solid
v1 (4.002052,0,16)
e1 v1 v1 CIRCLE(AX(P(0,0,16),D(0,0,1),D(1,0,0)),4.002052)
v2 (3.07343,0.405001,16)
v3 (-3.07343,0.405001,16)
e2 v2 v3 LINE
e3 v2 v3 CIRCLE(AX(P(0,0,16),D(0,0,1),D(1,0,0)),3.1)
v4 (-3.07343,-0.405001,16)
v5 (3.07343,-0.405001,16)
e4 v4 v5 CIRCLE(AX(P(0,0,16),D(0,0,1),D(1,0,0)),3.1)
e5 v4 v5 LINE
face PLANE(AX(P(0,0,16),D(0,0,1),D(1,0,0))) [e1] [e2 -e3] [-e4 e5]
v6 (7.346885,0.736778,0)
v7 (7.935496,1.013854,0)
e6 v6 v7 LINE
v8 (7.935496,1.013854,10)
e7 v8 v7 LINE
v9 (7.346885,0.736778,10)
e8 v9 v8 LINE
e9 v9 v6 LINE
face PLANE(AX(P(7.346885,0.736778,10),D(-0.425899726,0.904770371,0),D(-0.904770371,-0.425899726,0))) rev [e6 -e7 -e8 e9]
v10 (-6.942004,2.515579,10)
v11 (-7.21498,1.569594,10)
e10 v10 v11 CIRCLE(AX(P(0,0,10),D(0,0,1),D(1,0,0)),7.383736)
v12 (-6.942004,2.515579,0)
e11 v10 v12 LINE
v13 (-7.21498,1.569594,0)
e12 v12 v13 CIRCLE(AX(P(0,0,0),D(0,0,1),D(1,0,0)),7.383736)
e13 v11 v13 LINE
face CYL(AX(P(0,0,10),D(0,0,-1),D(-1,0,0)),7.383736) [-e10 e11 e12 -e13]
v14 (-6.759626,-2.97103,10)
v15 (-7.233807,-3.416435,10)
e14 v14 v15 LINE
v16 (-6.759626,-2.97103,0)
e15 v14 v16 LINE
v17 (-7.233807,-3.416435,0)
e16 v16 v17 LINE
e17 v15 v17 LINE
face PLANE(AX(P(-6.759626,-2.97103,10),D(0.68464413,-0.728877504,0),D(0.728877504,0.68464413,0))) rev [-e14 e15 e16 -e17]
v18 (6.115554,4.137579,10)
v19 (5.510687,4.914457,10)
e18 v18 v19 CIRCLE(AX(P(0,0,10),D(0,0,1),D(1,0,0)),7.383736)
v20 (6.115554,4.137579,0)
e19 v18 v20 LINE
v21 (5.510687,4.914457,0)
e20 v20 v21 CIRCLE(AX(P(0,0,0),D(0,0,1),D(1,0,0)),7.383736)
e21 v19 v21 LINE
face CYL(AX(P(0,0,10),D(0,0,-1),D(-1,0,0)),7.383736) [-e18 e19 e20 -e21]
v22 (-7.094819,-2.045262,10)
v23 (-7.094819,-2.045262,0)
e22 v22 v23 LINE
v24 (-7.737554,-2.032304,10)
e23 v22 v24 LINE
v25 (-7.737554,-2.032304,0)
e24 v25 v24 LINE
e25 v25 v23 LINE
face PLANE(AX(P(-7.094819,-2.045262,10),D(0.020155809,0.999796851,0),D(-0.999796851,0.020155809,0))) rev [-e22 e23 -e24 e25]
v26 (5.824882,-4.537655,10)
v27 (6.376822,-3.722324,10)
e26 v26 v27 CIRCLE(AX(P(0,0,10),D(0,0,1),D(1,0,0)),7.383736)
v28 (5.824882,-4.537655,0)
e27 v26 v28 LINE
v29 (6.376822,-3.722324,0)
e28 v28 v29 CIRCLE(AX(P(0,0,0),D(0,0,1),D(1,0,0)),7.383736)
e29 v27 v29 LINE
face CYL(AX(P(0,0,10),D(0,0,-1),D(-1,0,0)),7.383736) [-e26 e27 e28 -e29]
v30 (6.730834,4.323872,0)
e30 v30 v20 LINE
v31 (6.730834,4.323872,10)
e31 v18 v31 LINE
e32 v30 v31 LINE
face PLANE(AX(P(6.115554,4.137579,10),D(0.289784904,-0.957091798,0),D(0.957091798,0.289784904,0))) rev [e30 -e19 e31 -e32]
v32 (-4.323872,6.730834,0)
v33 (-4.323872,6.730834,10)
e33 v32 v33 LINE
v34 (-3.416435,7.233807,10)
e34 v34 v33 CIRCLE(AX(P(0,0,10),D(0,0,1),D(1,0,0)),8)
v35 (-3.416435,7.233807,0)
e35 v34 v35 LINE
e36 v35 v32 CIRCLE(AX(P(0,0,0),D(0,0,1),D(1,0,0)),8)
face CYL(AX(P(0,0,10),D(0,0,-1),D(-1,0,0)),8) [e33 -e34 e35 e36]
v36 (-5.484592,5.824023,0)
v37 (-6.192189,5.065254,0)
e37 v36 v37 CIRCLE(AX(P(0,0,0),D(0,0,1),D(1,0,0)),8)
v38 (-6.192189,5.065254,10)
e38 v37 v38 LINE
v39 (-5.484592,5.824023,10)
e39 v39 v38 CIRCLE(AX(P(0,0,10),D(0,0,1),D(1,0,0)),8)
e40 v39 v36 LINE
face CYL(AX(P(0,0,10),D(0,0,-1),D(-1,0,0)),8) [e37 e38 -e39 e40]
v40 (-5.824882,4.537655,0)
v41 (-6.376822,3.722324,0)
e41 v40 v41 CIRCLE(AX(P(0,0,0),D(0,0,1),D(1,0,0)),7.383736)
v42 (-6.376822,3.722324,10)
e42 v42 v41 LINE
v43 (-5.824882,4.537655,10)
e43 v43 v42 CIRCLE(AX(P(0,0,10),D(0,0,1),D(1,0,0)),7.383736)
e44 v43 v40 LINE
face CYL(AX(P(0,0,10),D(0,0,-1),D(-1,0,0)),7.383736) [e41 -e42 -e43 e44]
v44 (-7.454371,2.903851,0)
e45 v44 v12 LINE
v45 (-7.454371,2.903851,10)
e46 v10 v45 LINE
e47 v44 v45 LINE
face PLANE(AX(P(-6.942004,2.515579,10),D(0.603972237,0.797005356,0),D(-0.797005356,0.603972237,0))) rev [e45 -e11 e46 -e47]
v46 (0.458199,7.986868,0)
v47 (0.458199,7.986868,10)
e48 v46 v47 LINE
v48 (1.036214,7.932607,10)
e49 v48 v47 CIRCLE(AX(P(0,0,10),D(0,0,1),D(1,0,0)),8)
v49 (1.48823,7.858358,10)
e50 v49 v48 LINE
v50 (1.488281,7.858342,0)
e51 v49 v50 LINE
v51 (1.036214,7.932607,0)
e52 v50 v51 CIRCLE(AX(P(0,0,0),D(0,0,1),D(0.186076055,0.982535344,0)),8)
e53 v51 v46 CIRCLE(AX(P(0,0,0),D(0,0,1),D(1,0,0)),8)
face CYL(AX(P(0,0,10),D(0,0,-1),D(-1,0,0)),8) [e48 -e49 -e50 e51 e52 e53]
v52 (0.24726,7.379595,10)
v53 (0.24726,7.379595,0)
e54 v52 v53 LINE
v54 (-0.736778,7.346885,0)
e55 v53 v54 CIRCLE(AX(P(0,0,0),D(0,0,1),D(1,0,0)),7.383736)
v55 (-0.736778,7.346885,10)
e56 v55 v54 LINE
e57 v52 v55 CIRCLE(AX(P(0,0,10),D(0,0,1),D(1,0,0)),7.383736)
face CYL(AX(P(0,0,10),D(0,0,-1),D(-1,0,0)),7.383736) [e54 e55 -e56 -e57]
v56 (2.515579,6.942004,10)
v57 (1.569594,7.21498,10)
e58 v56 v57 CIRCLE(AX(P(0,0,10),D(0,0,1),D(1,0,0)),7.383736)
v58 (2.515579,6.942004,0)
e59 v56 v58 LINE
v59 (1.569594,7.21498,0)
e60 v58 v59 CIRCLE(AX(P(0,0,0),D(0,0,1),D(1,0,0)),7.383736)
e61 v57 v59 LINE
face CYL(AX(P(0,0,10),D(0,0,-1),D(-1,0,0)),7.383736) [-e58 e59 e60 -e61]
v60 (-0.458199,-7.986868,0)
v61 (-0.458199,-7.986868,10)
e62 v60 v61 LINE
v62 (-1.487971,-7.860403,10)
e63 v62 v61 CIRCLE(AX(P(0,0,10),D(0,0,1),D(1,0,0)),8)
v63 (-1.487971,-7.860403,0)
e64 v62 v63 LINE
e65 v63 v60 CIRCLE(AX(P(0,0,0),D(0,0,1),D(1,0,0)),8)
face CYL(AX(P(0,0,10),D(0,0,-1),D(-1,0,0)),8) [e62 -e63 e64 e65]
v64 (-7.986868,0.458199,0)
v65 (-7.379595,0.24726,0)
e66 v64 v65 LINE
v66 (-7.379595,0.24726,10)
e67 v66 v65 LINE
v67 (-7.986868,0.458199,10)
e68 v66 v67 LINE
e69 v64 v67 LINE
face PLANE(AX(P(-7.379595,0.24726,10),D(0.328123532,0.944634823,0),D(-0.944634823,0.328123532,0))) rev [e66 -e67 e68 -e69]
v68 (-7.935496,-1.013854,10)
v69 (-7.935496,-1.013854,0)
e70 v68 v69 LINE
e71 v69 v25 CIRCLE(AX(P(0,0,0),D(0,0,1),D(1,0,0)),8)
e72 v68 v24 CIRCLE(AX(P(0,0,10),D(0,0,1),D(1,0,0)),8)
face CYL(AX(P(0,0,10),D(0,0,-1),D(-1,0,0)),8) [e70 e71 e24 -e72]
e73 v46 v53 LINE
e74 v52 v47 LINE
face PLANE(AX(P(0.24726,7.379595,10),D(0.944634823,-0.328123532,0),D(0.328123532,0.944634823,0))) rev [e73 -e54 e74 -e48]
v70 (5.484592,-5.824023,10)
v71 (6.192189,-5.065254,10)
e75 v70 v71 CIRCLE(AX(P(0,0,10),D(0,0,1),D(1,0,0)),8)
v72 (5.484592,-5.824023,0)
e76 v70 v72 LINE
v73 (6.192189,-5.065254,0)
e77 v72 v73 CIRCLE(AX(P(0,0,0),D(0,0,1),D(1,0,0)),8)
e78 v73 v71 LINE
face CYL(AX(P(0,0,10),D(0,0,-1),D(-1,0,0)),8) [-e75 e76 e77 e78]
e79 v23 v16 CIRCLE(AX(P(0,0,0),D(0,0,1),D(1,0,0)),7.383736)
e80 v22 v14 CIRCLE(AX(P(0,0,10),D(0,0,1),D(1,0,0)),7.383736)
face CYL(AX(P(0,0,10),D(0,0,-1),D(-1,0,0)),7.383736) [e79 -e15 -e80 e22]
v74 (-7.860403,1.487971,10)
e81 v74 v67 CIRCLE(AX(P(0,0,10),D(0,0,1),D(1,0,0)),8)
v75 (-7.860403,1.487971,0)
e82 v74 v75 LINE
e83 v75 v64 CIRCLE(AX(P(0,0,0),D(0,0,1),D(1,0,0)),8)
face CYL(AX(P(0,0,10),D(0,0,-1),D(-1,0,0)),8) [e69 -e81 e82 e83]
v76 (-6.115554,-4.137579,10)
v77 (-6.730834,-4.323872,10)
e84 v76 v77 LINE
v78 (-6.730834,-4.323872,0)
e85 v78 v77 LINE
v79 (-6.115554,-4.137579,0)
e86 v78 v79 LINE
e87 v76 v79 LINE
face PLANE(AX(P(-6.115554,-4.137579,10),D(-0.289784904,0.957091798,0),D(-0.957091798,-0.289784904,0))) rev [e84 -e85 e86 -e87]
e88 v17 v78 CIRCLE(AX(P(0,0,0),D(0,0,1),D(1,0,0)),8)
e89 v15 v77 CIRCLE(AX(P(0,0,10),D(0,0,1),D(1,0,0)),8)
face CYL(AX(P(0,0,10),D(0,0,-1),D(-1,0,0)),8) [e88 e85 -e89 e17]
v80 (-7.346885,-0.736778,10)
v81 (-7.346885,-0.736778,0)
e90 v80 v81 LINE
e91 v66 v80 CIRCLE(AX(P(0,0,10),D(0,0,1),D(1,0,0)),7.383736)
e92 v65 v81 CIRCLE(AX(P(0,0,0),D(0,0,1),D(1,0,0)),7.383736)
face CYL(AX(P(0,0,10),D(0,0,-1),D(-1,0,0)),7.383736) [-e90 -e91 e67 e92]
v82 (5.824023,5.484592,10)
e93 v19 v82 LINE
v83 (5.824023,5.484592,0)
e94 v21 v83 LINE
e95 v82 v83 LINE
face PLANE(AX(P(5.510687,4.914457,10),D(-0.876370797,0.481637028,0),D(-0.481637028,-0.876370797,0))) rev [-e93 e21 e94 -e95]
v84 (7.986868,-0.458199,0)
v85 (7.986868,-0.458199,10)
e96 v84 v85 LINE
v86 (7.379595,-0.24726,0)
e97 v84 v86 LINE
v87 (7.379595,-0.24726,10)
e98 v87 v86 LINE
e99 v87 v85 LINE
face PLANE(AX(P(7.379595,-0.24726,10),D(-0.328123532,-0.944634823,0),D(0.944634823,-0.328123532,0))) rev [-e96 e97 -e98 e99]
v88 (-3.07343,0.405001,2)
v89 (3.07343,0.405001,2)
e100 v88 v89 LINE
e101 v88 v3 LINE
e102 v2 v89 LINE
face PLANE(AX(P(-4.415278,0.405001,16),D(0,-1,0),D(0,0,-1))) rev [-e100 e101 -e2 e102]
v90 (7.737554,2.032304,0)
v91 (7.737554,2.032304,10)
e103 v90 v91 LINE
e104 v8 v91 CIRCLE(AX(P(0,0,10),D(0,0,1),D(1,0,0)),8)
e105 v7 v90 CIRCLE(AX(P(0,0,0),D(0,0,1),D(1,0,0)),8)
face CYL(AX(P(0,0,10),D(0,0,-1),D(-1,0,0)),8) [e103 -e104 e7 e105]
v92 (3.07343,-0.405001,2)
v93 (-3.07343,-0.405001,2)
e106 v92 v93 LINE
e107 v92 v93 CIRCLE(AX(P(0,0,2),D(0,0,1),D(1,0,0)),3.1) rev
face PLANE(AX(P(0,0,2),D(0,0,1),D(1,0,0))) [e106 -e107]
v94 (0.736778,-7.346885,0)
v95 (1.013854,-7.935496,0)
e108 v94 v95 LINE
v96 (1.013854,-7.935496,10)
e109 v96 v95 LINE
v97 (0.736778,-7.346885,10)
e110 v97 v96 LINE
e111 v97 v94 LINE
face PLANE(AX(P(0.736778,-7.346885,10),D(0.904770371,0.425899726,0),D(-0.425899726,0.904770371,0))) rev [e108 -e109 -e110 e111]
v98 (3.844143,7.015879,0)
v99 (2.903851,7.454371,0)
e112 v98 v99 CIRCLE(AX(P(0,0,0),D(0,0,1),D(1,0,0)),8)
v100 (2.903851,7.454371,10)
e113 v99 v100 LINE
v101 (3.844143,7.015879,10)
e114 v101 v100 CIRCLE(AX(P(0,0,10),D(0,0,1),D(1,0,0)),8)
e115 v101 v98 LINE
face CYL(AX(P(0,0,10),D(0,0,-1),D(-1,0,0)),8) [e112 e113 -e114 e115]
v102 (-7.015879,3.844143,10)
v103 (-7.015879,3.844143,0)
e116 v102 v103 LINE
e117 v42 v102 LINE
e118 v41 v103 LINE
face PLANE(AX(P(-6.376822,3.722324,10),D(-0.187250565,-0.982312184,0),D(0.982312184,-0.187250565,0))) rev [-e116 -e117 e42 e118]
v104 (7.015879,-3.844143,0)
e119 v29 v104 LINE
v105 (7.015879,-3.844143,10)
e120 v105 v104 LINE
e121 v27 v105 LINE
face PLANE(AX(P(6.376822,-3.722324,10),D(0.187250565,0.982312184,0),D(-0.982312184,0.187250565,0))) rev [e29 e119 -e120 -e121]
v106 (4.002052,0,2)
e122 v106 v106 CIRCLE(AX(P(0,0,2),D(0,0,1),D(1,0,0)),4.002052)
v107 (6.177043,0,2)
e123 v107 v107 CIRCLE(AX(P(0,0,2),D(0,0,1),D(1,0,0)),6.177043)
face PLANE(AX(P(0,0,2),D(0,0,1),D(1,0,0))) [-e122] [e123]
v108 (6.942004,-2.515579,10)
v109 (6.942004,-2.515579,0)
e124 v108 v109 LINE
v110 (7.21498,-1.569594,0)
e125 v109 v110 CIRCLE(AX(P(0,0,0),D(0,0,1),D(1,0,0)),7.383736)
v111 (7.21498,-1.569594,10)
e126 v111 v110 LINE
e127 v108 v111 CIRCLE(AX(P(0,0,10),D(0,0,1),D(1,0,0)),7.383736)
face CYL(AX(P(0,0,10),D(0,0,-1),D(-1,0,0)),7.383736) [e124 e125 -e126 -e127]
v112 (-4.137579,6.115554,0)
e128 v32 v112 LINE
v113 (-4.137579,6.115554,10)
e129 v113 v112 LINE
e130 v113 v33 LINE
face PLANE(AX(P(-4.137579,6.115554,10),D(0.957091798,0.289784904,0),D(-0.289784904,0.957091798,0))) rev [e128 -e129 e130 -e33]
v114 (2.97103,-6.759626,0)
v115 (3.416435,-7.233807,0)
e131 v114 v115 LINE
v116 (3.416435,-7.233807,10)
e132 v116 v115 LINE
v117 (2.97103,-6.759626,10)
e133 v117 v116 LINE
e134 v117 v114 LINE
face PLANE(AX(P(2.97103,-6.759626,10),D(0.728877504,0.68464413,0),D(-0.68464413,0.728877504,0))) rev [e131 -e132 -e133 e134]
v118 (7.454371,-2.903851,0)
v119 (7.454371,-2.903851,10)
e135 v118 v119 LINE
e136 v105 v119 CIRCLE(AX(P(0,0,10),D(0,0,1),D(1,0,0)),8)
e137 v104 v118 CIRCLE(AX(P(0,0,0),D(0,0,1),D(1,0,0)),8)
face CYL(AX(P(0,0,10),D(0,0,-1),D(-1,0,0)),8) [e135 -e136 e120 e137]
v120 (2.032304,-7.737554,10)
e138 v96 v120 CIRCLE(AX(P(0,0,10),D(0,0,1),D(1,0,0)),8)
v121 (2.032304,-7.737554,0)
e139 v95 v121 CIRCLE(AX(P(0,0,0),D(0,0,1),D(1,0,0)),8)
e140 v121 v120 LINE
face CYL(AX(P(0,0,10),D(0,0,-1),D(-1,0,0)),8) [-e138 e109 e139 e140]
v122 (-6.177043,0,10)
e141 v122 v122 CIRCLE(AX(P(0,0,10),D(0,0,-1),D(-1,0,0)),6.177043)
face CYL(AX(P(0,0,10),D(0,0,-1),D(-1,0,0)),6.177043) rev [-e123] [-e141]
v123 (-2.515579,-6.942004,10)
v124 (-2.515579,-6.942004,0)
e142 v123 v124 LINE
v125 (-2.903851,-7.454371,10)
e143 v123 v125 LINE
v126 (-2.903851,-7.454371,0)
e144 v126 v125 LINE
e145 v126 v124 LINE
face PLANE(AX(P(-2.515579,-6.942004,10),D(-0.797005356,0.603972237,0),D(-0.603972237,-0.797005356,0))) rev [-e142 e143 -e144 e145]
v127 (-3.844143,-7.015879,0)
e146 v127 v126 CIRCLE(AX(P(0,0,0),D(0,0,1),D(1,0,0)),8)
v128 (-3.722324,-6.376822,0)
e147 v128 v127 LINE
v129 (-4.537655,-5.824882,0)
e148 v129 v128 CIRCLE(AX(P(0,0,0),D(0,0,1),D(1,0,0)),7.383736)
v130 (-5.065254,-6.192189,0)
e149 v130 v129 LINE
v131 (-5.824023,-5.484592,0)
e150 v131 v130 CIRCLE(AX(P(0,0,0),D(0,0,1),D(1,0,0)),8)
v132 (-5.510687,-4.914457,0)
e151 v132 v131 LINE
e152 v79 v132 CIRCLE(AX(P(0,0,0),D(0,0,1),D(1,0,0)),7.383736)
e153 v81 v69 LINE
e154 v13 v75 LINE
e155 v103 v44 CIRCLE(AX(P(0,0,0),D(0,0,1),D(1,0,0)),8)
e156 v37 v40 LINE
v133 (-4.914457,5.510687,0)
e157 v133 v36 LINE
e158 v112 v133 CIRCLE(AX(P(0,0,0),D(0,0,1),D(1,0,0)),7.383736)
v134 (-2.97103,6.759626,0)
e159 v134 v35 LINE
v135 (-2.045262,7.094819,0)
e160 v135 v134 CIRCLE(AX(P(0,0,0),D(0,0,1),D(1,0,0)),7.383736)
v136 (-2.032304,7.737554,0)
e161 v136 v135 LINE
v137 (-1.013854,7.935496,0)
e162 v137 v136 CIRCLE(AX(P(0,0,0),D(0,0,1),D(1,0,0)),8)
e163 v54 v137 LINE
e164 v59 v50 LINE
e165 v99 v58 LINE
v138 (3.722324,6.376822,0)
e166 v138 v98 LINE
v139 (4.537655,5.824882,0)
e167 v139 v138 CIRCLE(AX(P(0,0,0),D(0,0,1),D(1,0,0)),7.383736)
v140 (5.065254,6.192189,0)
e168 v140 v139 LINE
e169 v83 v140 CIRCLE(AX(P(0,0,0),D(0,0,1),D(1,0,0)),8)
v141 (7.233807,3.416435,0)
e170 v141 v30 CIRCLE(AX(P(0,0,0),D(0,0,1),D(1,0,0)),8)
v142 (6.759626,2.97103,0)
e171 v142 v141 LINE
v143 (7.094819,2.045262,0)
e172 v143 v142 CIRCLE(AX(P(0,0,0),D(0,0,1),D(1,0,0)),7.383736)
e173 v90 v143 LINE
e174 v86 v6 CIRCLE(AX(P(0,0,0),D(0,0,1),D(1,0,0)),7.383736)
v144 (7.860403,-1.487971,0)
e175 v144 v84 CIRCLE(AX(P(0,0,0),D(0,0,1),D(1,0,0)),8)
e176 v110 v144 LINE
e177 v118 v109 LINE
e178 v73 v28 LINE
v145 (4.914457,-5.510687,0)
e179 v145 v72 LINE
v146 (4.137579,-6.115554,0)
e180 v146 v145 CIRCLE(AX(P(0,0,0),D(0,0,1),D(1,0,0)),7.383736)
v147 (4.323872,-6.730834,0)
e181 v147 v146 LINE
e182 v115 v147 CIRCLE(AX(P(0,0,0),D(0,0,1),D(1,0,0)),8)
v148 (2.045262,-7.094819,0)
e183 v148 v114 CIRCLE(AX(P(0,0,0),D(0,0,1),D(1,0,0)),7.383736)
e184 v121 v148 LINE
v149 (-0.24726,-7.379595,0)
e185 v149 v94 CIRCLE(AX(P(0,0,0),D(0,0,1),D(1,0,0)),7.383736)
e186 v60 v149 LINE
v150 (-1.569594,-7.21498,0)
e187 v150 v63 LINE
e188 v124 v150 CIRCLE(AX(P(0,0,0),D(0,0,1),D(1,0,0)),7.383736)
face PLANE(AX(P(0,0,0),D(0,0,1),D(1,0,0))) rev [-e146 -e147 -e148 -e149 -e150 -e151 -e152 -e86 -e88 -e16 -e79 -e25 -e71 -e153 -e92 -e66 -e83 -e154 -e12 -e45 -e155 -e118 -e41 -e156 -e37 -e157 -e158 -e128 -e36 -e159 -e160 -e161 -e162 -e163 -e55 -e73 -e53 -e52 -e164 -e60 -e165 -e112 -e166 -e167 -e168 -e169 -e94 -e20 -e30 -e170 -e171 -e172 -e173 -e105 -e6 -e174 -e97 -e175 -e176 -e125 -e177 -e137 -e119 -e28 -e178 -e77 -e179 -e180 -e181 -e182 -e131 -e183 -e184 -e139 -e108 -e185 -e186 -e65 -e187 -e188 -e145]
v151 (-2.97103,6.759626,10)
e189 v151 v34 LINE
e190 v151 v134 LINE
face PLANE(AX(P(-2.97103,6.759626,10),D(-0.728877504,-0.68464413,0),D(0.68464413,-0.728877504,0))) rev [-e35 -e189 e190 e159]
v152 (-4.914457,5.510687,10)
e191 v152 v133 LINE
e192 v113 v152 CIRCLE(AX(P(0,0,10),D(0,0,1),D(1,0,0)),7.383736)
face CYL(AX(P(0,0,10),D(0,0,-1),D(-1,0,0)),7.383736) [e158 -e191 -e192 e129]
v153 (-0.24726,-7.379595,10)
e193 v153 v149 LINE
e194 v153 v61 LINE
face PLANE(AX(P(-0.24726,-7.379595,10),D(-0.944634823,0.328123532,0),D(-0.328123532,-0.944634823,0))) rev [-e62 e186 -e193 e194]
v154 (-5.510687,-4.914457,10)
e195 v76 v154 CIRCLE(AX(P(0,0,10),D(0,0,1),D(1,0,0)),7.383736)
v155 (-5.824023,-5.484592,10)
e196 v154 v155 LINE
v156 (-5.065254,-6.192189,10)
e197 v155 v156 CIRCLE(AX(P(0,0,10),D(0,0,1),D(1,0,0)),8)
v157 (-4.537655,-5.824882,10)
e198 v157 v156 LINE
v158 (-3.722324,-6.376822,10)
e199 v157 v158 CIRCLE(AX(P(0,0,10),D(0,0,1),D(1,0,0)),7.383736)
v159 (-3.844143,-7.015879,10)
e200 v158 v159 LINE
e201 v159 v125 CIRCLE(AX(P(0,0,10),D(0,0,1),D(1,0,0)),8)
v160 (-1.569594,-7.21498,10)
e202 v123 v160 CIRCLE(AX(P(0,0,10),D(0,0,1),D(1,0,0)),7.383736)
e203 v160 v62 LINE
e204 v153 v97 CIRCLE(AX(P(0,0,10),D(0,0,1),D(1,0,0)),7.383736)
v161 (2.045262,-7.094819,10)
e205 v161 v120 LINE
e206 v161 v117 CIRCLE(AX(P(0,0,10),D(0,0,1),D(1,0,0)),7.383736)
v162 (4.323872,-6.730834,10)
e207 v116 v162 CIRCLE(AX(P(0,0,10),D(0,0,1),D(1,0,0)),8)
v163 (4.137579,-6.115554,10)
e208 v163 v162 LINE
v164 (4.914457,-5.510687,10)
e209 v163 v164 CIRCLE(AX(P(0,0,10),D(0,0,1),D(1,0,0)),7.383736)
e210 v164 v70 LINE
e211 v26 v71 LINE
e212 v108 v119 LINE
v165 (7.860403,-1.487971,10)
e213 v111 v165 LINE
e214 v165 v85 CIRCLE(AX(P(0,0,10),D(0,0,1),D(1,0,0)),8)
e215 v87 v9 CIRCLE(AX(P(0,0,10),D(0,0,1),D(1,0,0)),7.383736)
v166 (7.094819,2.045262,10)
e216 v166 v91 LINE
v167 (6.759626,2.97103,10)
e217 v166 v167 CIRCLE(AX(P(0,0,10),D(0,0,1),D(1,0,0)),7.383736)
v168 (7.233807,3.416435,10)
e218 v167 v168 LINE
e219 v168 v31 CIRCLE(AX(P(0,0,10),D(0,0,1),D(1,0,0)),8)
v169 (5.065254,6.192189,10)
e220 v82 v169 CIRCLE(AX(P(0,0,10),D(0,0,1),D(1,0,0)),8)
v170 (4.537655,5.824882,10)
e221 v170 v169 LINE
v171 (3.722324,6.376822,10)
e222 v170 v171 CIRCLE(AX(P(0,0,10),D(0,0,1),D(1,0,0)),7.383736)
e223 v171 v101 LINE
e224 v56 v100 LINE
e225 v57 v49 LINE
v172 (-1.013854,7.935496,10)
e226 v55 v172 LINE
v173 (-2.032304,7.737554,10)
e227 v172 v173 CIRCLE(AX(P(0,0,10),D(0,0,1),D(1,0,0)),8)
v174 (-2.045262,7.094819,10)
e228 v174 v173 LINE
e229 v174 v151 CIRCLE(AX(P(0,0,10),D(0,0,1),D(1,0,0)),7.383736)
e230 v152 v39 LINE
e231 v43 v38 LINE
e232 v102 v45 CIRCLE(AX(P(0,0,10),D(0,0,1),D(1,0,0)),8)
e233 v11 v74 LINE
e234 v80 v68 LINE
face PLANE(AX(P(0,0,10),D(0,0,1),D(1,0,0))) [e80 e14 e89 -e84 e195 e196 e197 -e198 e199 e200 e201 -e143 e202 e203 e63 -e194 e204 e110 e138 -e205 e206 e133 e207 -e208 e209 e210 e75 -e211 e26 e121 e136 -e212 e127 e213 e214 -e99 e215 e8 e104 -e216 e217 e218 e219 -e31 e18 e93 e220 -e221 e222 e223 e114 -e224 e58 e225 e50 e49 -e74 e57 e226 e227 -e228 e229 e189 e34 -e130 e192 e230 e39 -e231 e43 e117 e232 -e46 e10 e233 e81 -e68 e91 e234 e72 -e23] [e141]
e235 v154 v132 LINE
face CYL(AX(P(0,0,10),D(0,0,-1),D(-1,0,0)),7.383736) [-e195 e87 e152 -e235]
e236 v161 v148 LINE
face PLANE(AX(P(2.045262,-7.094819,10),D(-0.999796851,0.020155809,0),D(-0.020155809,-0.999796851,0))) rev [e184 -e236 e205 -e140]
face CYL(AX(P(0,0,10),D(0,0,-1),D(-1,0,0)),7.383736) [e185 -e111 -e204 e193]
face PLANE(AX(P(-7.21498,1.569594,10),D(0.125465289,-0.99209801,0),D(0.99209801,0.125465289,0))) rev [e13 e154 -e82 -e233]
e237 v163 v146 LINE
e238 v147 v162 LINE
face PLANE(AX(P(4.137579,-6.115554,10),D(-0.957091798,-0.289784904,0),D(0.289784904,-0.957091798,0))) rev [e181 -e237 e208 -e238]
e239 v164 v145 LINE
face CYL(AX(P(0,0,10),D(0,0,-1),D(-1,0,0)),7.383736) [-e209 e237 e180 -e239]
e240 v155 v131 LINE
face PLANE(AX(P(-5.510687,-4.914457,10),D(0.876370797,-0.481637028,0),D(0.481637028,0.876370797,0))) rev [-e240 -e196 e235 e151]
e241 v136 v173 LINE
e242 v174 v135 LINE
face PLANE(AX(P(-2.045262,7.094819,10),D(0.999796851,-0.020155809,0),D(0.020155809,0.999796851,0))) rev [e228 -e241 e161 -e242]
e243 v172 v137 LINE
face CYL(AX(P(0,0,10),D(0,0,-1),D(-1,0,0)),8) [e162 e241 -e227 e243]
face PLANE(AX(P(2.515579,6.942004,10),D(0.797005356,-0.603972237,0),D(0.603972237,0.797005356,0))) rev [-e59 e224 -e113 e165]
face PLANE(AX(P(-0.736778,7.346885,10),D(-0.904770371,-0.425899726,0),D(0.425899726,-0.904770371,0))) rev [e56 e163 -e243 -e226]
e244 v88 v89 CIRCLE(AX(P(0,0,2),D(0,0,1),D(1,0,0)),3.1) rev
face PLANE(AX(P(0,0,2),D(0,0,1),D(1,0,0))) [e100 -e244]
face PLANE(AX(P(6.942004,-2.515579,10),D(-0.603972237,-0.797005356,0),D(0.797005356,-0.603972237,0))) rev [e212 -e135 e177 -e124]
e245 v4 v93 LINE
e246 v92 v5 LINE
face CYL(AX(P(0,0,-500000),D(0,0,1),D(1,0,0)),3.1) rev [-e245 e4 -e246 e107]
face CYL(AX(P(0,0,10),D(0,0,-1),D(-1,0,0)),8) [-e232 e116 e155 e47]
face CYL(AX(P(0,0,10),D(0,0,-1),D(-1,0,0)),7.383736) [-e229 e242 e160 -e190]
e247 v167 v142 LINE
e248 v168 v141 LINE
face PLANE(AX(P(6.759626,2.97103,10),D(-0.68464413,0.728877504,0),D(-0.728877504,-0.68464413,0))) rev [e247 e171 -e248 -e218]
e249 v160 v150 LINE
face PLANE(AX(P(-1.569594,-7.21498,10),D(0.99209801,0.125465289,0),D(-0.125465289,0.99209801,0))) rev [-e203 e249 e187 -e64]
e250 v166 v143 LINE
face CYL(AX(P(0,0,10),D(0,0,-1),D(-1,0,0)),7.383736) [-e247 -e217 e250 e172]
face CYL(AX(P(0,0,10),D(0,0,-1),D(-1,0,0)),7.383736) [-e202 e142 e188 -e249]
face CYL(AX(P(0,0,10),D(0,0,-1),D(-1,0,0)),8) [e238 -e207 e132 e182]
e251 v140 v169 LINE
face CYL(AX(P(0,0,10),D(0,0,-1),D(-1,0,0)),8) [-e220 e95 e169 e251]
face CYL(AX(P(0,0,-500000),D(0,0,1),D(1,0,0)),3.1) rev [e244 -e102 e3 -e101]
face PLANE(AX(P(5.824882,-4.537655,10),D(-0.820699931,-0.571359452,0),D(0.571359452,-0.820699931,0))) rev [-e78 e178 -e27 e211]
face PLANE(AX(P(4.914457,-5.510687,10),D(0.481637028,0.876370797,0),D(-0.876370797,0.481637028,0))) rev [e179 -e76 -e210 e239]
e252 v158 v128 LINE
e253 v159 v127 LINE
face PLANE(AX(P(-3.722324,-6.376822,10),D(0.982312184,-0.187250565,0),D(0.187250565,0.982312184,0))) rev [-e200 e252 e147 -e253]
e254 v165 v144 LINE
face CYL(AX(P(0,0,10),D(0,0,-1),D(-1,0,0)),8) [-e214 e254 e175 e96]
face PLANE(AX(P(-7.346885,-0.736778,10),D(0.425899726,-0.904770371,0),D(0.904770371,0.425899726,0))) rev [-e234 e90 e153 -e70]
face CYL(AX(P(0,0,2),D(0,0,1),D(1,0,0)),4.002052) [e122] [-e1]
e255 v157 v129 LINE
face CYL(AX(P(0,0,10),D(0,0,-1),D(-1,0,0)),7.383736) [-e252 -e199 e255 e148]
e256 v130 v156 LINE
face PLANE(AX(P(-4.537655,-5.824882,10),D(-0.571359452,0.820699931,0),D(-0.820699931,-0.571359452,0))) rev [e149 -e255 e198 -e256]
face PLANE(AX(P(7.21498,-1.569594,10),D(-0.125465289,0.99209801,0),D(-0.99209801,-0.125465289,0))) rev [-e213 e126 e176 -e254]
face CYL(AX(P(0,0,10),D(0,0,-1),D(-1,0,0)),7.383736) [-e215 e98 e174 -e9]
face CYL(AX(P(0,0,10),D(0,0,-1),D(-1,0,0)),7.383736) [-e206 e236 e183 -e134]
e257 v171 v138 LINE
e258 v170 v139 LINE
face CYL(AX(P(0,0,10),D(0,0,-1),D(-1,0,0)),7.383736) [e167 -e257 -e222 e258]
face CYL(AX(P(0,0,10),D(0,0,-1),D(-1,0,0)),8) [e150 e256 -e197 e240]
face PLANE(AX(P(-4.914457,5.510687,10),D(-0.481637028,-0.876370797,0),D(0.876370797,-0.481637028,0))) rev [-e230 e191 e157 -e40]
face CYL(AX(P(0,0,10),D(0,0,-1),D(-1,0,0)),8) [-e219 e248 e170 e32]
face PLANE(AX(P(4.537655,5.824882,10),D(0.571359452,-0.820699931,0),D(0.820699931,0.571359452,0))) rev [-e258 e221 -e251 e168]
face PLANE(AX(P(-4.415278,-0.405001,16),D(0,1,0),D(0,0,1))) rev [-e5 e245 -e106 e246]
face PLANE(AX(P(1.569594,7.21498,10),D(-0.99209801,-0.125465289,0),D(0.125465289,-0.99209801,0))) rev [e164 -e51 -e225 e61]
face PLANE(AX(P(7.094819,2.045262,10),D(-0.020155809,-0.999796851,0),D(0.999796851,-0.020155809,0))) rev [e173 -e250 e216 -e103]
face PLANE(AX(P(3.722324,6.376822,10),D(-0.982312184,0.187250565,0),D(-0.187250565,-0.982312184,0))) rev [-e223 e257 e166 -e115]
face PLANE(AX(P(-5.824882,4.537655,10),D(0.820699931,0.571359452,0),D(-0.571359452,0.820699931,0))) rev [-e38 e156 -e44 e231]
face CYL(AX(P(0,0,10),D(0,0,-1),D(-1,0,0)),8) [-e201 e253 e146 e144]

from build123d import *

# Parameters (mm, degrees)
CROQUIS1_R                    = 8
SALIENTE_EXTRUIR1_DEPTH       = 10
CROQUIS2_R                    = 7
CORTAR_EXTRUIR1_DEPTH         = 8
CROQUIS3_R                    = 5
SALIENTE_EXTRUIR2_DEPTH       = 14
CROQUIS4_R                    = 3.5
CORTAR_EXTRUIR2_DEPTH         = 14
CROQUIS5_W                    = 8.830556774
CROQUIS5_H                    = 0.810001326
SALIENTE_EXTRUIR3_DEPTH       = 14
SALIENTE_EXTRUIR4_START       = -10
SALIENTE_EXTRUIR4_OUTLINE_R   = 7
SALIENTE_EXTRUIR4_OUTLINE_R_2 = 6.177042676
SALIENTE_EXTRUIR4_DEPTH       = 8
CORTAR_EXTRUIR10_DEPTH        = 10
SALIENTE_EXTRUIR7_START       = -14
CROQUIS12_R                   = 3.5
CROQUIS12_R_2                 = 3.1
SALIENTE_EXTRUIR7_DEPTH       = 14
CROQUIS14_R                   = 5.293122991
CROQUIS14_R_2                 = 4.002052416
CORTAR_EXTRUIR15_DEPTH        = 14


# Read off the part's stored shape, not the designer's step: Saliente-Extruir4
with BuildPart() as part:
    # Croquis1 → Saliente-Extruir1 (new body)
    with BuildSketch(Plane.XY):
        Circle(CROQUIS1_R)
    extrude(amount=SALIENTE_EXTRUIR1_DEPTH)

    # Croquis2 → Cortar-Extruir1 (cut)
    with BuildSketch(Plane.XY.offset(10)):
        Circle(CROQUIS2_R)
    extrude(amount=-CORTAR_EXTRUIR1_DEPTH, mode=Mode.SUBTRACT)

    # Croquis3 → Saliente-Extruir2 (add)
    with BuildSketch(Plane.XY.offset(2)):
        Circle(CROQUIS3_R)
    extrude(amount=SALIENTE_EXTRUIR2_DEPTH)

    # Croquis4 → Cortar-Extruir2 (cut)
    with BuildSketch(Plane.XY.offset(16)):
        Circle(CROQUIS4_R)
    extrude(amount=-CORTAR_EXTRUIR2_DEPTH, mode=Mode.SUBTRACT)

    # Croquis5 → Saliente-Extruir3 (add)
    with BuildSketch(Plane.XY.offset(2)):
        Rectangle(CROQUIS5_W, CROQUIS5_H)
    extrude(amount=SALIENTE_EXTRUIR3_DEPTH)

    # Saliente-Extruir4 outline → Saliente-Extruir4 (add)
    with BuildSketch(Plane(origin=(0, 0, 0), x_dir=(-1, 0, 0), z_dir=(0, 0, -1)).offset(SALIENTE_EXTRUIR4_START)):
        Circle(SALIENTE_EXTRUIR4_OUTLINE_R)
        Circle(SALIENTE_EXTRUIR4_OUTLINE_R_2, mode=Mode.SUBTRACT)
    extrude(amount=SALIENTE_EXTRUIR4_DEPTH)

    # Croquis11 → Cortar-Extruir10 (cut)
    with BuildSketch(Plane(origin=(0, 0, 0), x_dir=(-1, 0, 0), z_dir=(0, 0, -1))):
        with BuildLine():
            Line((-0.247260298, 7.379594776), (-0.5002941, 8.108053777))
            Line((-0.5002941, 8.108053777), (1.061510951, 8.036738478))
            Line((1.061510951, 8.036738478), (0.736778233, 7.346884683))
            ThreePointArc((0.736778233, 7.346884683), (0.245304789, 7.379660038), (-0.247260298, 7.379594776))
        make_face()
        with BuildLine():
            Line((2.029718445, 7.865816758), (3.493045676, 7.315367575))
            Line((3.493045676, 7.315367575), (2.971029962, 6.759625557))
            ThreePointArc((2.971029962, 6.759625557), (2.513739083, 6.942670418), (2.045261679, 7.094819334))
            Line((2.045261679, 7.094819334), (2.029718445, 7.865816758))
        make_face()
        with BuildLine():
            Line((4.137579194, 6.115553542), (4.361048006, 6.853618791))
            Line((4.361048006, 6.853618791), (5.582656753, 5.877917526))
            Line((5.582656753, 5.877917526), (4.914456579, 5.510687185))
            ThreePointArc((4.914456579, 5.510687185), (4.536111081, 5.826083846), (4.137579194, 6.115553542))
        make_face()
        with BuildLine():
            Line((5.824881629, 4.537654761), (6.265487803, 5.170540864))
            Line((6.265487803, 5.170540864), (7.12579849, 3.865095955))
            Line((7.12579849, 3.865095955), (6.376821944, 3.722324356))
            ThreePointArc((6.376821944, 3.722324356), (6.114456921, 4.139199594), (5.824881629, 4.537654761))
        make_face()
        with BuildLine():
            Line((6.942004065, 2.515578715), (7.556618, 2.981334372))
            Line((7.556618, 2.981334372), (7.971417423, 1.473931862))
            Line((7.971417423, 1.473931862), (7.214979548, 1.569594483))
            ThreePointArc((7.214979548, 1.569594483), (7.094277116, 2.047141646), (6.942004065, 2.515578715))
        make_face()
        with BuildLine():
            Line((7.379594776, 0.247260298), (8.108053777, 0.5002941))
            Line((8.108053777, 0.5002941), (8.036738478, -1.061510951))
            Line((8.036738478, -1.061510951), (7.346884683, -0.736778233))
            ThreePointArc((7.346884683, -0.736778233), (7.379660038, -0.245304789), (7.379594776, 0.247260298))
        make_face()
        with BuildLine():
            Line((7.094819334, -2.045261679), (7.865816758, -2.029718445))
            Line((7.865816758, -2.029718445), (7.315367575, -3.493045676))
            Line((7.315367575, -3.493045676), (6.759625557, -2.971029962))
            ThreePointArc((6.759625557, -2.971029962), (6.942670418, -2.513739083), (7.094819334, -2.045261679))
        make_face()
        with BuildLine():
            Line((6.115553542, -4.137579194), (6.853618791, -4.361048006))
            Line((6.853618791, -4.361048006), (5.877917526, -5.582656753))
            Line((5.877917526, -5.582656753), (5.510687185, -4.914456579))
            ThreePointArc((5.510687185, -4.914456579), (5.826083846, -4.536111081), (6.115553542, -4.137579194))
        make_face()
        with BuildLine():
            Line((4.537654761, -5.824881629), (5.170540864, -6.265487803))
            Line((5.170540864, -6.265487803), (3.865095955, -7.12579849))
            Line((3.865095955, -7.12579849), (3.722324356, -6.376821944))
            ThreePointArc((3.722324356, -6.376821944), (4.139199594, -6.114456921), (4.537654761, -5.824881629))
        make_face()
        with BuildLine():
            Line((2.515578715, -6.942004065), (2.981334372, -7.556618))
            Line((2.981334372, -7.556618), (1.473931862, -7.971417423))
            Line((1.473931862, -7.971417423), (1.569594483, -7.214979548))
            ThreePointArc((1.569594483, -7.214979548), (2.047141646, -7.094277116), (2.515578715, -6.942004065))
        make_face()
        with BuildLine():
            Line((0.247260298, -7.379594776), (0.5002941, -8.108053777))
            Line((0.5002941, -8.108053777), (-1.061510951, -8.036738478))
            Line((-1.061510951, -8.036738478), (-0.736778233, -7.346884683))
            ThreePointArc((-0.736778233, -7.346884683), (-0.245304789, -7.379660038), (0.247260298, -7.379594776))
        make_face()
        with BuildLine():
            Line((-2.045261679, -7.094819334), (-2.029718445, -7.865816758))
            Line((-2.029718445, -7.865816758), (-3.493045676, -7.315367575))
            Line((-3.493045676, -7.315367575), (-2.971029962, -6.759625557))
            ThreePointArc((-2.971029962, -6.759625557), (-2.513739083, -6.942670418), (-2.045261679, -7.094819334))
        make_face()
        with BuildLine():
            Line((-4.137579194, -6.115553542), (-4.361048006, -6.853618791))
            Line((-4.361048006, -6.853618791), (-5.582656753, -5.877917526))
            Line((-5.582656753, -5.877917526), (-4.914456579, -5.510687185))
            ThreePointArc((-4.914456579, -5.510687185), (-4.536111081, -5.826083846), (-4.137579194, -6.115553542))
        make_face()
        with BuildLine():
            Line((-5.824881629, -4.537654761), (-6.265487803, -5.170540864))
            Line((-6.265487803, -5.170540864), (-7.12579849, -3.865095955))
            Line((-7.12579849, -3.865095955), (-6.376821944, -3.722324356))
            ThreePointArc((-6.376821944, -3.722324356), (-6.114456921, -4.139199594), (-5.824881629, -4.537654761))
        make_face()
        with BuildLine():
            Line((-6.942004065, -2.515578715), (-7.556618, -2.981334372))
            Line((-7.556618, -2.981334372), (-7.971417423, -1.473931862))
            Line((-7.971417423, -1.473931862), (-7.214979548, -1.569594483))
            ThreePointArc((-7.214979548, -1.569594483), (-7.094277116, -2.047141646), (-6.942004065, -2.515578715))
        make_face()
        with BuildLine():
            Line((-7.379594776, -0.247260298), (-8.108053777, -0.5002941))
            Line((-8.108053777, -0.5002941), (-8.036738478, 1.061510951))
            Line((-8.036738478, 1.061510951), (-7.346884683, 0.736778233))
            ThreePointArc((-7.346884683, 0.736778233), (-7.379660038, 0.245304789), (-7.379594776, -0.247260298))
        make_face()
        with BuildLine():
            Line((-7.094819334, 2.045261679), (-7.865816758, 2.029718445))
            Line((-7.865816758, 2.029718445), (-7.315367575, 3.493045676))
            Line((-7.315367575, 3.493045676), (-6.759625557, 2.971029962))
            ThreePointArc((-6.759625557, 2.971029962), (-6.942670418, 2.513739083), (-7.094819334, 2.045261679))
        make_face()
        with BuildLine():
            Line((-6.115553542, 4.137579194), (-6.853618791, 4.361048006))
            Line((-6.853618791, 4.361048006), (-5.877917526, 5.582656753))
            Line((-5.877917526, 5.582656753), (-5.510687185, 4.914456579))
            ThreePointArc((-5.510687185, 4.914456579), (-5.826083846, 4.536111081), (-6.115553542, 4.137579194))
        make_face()
        with BuildLine():
            Line((-4.537654761, 5.824881629), (-5.170540864, 6.265487803))
            Line((-5.170540864, 6.265487803), (-3.865095955, 7.12579849))
            Line((-3.865095955, 7.12579849), (-3.722324356, 6.376821944))
            ThreePointArc((-3.722324356, 6.376821944), (-4.139199594, 6.114456921), (-4.537654761, 5.824881629))
        make_face()
        with BuildLine():
            Line((-2.515578715, 6.942004065), (-2.981334372, 7.556618))
            Line((-2.981334372, 7.556618), (-1.473931862, 7.971417423))
            Line((-1.473931862, 7.971417423), (-1.569594483, 7.214979548))
            ThreePointArc((-1.569594483, 7.214979548), (-2.047141646, 7.094277116), (-2.515578715, 6.942004065))
        make_face()
    extrude(amount=-CORTAR_EXTRUIR10_DEPTH, mode=Mode.SUBTRACT)

    # Croquis12 → Saliente-Extruir7 (add)
    with BuildSketch(Plane.XY.offset(16).offset(SALIENTE_EXTRUIR7_START)):
        Circle(CROQUIS12_R)
        Circle(CROQUIS12_R_2, mode=Mode.SUBTRACT)
    extrude(amount=SALIENTE_EXTRUIR7_DEPTH)

    # Croquis14 → Cortar-Extruir15 (cut)
    with BuildSketch(Plane.XY.offset(16)):
        Circle(CROQUIS14_R)
        Circle(CROQUIS14_R_2, mode=Mode.SUBTRACT)
    extrude(amount=-CORTAR_EXTRUIR15_DEPTH, mode=Mode.SUBTRACT)


solid = part.part
